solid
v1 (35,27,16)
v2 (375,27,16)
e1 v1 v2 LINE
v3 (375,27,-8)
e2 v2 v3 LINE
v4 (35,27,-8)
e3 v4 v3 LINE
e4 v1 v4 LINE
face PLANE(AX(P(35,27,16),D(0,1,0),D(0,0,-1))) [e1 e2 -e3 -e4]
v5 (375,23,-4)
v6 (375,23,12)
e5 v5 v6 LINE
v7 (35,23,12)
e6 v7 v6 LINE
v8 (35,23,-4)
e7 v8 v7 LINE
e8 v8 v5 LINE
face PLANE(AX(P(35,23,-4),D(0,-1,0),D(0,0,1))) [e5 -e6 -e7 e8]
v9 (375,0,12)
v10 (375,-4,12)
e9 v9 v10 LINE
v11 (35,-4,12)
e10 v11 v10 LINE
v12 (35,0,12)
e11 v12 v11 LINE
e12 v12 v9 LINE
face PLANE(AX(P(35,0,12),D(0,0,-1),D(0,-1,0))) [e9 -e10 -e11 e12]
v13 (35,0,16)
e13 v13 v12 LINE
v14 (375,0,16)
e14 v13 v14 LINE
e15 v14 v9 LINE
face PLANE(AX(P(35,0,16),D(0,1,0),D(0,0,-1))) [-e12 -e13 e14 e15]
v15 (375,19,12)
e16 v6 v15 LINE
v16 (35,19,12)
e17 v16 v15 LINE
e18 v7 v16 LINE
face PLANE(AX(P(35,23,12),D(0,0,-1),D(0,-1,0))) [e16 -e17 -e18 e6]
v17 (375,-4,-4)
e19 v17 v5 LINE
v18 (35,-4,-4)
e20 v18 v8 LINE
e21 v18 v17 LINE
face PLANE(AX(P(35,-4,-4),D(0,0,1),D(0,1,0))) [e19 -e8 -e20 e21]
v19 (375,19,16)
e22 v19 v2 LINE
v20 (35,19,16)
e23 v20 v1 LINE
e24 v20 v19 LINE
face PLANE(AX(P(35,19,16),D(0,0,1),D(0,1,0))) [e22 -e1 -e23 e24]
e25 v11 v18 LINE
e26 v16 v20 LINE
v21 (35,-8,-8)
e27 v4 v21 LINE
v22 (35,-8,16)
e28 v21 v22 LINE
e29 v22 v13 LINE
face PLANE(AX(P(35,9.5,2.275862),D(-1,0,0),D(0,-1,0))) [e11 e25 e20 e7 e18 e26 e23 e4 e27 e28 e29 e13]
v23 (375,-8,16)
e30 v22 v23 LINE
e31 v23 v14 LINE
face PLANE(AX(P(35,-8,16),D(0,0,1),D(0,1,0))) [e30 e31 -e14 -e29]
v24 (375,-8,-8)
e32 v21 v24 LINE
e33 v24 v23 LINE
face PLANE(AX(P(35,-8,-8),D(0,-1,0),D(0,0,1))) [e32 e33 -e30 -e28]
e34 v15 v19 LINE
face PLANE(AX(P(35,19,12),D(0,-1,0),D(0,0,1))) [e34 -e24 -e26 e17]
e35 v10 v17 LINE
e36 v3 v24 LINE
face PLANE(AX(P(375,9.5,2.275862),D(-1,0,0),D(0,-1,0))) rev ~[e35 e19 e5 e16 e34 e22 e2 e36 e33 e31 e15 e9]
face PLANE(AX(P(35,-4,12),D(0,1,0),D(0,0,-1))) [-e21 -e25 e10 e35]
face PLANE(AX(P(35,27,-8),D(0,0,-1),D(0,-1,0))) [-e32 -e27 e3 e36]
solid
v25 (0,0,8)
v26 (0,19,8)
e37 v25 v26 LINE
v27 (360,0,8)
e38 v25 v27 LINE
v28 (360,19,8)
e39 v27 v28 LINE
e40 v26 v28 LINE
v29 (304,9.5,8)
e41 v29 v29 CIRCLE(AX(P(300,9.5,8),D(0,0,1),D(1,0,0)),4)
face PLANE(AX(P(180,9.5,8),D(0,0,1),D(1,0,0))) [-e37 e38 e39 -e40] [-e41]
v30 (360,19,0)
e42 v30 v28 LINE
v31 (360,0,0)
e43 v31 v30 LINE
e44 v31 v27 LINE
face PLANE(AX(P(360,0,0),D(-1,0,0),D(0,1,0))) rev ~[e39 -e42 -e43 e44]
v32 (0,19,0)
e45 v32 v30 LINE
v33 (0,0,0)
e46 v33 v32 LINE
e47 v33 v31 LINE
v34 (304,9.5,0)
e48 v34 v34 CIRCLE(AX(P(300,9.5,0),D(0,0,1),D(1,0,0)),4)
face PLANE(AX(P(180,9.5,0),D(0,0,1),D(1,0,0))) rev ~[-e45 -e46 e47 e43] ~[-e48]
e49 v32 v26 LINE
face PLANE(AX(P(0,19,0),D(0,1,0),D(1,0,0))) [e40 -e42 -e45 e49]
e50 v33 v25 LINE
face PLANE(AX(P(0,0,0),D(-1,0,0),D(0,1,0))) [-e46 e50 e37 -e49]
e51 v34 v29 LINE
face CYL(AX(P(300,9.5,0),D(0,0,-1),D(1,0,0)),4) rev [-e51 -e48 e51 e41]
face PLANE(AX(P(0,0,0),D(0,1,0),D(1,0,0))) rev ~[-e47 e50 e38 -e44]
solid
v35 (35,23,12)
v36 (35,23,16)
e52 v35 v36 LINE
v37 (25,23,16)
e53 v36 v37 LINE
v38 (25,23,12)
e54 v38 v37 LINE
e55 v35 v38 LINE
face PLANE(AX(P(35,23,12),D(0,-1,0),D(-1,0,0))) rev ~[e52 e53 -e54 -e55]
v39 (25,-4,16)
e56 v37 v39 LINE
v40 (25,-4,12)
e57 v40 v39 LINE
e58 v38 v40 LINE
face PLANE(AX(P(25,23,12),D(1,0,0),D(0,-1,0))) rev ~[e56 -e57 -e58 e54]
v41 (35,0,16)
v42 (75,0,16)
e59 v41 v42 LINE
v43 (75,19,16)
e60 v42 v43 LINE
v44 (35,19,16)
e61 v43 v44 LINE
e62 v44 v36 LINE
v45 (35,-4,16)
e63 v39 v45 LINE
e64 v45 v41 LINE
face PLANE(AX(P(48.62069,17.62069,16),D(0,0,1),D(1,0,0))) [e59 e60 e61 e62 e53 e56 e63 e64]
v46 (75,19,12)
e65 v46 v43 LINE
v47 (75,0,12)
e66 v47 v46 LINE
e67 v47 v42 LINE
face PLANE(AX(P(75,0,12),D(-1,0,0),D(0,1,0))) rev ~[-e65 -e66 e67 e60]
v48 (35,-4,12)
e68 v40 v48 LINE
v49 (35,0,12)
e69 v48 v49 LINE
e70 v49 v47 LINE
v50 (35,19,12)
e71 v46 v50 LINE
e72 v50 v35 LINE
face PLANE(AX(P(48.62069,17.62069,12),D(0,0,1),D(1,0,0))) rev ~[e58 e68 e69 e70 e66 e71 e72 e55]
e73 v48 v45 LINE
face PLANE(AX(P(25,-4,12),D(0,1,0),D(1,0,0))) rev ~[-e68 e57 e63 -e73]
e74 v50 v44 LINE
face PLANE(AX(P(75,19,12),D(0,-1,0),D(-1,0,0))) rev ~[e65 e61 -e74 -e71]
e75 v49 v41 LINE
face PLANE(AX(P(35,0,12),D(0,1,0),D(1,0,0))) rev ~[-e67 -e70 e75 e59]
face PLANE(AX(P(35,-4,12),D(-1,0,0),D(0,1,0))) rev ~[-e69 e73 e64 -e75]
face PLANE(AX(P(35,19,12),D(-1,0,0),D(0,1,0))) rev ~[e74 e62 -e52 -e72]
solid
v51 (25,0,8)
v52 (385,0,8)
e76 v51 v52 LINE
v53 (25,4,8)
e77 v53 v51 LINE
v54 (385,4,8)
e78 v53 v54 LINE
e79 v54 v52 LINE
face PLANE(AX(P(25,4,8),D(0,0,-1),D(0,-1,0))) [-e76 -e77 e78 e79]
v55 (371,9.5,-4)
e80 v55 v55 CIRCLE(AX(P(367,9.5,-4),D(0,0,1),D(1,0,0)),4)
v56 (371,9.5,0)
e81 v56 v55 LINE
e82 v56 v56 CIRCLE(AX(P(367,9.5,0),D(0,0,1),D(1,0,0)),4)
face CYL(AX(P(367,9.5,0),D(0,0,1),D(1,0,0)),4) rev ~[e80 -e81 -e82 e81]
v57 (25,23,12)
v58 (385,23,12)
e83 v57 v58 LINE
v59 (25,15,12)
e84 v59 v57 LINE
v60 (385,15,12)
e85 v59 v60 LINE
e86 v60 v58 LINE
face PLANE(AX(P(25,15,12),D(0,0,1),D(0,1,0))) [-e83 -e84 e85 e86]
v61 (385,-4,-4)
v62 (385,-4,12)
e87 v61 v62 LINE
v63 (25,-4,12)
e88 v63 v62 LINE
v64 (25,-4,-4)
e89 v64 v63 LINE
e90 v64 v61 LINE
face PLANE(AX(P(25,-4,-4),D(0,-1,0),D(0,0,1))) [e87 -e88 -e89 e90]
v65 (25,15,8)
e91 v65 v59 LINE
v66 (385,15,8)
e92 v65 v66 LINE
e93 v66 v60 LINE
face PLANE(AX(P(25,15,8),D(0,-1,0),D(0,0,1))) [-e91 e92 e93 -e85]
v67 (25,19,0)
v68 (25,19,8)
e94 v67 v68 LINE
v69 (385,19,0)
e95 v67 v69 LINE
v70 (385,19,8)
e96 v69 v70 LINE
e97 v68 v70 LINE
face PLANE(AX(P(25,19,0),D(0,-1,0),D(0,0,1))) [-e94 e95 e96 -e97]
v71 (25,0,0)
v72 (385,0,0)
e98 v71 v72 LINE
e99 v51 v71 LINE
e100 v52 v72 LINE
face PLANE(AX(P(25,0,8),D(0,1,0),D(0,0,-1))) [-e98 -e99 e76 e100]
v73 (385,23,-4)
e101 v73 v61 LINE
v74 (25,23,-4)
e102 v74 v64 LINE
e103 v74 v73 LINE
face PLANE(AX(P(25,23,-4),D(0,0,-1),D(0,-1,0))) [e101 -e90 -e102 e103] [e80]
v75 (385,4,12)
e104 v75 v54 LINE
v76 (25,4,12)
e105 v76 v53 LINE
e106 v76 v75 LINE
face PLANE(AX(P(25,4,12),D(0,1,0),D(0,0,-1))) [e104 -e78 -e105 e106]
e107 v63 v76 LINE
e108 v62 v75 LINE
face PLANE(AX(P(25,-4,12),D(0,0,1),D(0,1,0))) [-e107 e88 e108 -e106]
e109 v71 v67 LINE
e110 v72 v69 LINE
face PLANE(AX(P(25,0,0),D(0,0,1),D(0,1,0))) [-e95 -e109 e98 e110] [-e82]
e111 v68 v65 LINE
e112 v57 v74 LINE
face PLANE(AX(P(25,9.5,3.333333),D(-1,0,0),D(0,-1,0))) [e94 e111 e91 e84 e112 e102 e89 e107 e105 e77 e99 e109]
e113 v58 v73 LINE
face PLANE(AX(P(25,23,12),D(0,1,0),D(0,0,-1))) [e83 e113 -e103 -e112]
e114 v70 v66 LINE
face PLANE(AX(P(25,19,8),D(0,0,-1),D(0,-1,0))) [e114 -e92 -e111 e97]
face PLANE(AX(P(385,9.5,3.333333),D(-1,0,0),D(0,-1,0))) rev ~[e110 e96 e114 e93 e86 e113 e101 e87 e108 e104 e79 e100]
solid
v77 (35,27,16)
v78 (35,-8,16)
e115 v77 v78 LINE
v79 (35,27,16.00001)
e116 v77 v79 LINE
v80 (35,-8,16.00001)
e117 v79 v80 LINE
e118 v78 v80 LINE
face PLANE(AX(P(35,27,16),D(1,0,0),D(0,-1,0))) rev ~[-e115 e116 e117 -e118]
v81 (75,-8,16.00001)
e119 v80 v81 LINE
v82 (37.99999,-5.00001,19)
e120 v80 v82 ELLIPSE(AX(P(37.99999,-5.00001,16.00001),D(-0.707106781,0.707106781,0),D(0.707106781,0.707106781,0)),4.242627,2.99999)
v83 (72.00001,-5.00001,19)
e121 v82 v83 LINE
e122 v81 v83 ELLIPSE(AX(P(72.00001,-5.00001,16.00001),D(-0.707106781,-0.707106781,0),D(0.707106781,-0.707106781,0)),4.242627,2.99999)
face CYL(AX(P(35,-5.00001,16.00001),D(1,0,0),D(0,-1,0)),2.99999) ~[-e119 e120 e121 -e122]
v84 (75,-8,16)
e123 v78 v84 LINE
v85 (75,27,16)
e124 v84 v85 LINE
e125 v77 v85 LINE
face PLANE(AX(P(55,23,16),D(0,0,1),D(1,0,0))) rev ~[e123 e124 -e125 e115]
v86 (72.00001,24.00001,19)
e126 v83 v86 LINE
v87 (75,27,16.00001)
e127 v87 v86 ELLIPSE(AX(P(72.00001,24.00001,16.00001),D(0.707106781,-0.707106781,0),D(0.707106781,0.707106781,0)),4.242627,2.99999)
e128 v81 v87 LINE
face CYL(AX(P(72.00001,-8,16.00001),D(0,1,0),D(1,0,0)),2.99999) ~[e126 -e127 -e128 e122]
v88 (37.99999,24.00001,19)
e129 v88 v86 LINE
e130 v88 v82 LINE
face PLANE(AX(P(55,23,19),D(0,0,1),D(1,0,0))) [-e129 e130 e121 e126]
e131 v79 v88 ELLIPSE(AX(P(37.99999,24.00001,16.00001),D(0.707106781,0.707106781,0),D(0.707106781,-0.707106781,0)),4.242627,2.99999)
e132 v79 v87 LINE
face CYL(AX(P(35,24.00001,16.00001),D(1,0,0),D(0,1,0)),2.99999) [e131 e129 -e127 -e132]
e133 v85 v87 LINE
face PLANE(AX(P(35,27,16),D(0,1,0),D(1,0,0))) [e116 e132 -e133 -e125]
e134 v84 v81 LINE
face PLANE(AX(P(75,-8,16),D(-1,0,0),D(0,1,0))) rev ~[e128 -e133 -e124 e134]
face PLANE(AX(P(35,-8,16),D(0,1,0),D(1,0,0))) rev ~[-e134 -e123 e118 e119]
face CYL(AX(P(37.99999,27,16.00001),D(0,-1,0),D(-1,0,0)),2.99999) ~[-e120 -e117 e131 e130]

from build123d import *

# Parameters (mm, degrees)
F0_W      = 360
F0_H      = 19
F0_R      = 4
F1_DEPTH  = 8
F4_DEPTH  = 360
F7_DEPTH  = 340
F8_W      = 50
F8_H      = 11
F9_DEPTH  = 4
F10_W     = 40
F10_H     = 8
F10_H_2   = 19
F11_DEPTH = 3
F12_R     = 2.99999
F13_R     = 4
F14_DEPTH = 4


# Not quite as in the source:
# - a fillet or chamfer is up to 0.001 mm smaller than in the source, because OpenCascade refuses the exact size


with BuildPart() as f1:
    # F0 (on Top) → F1 (new body)
    with BuildSketch(Plane.XY):
        with Locations((180, 9.5)):
            Rectangle(F0_W, F0_H)
        with Locations((300, 9.5)):
            Circle(F0_R, mode=Mode.SUBTRACT)
    extrude(amount=F1_DEPTH)


with BuildPart() as f4:
    # F3 (on offset) → F4 (new body)
    with BuildSketch(Plane(origin=(25, 0, 0), x_dir=(0, -1, 0), z_dir=(-1, 0, 0))):
        Polygon((0, 0), (-19, 0), (-19, 8), (-15, 8), (-15, 12), (-23, 12), (-23, -4), (4, -4), (4, 12), (-4, 12), (-4, 8), (0, 8), align=None)
    extrude(amount=-F4_DEPTH)

    # F13 (on face) → F14 (cut)
    with BuildSketch(Plane.XY):
        with Locations((367, 9.5)):
            Circle(F13_R)
    extrude(amount=-F14_DEPTH, mode=Mode.SUBTRACT)


with BuildPart() as f7:
    # F6 (on offset) → F7 (new body)
    with BuildSketch(Plane(origin=(35, 0, 0), x_dir=(0, -1, 0), z_dir=(-1, 0, 0))):
        Polygon((-27, 16), (-27, -8), (8, -8), (8, 16), (0, 16), (0, 12), (4, 12), (4, -4), (-23, -4), (-23, 12), (-19, 12), (-19, 16), align=None)
    extrude(amount=-F7_DEPTH)


with BuildPart() as f9:
    # F8 (on face) → F9 (new body)
    with BuildSketch(Plane.XY.offset(12)):
        Polygon((35, 23), (25, 23), (25, 15), (75, 15), (75, 19), (35, 19), align=None)
        with Locations((50, 9.5)):
            Rectangle(F8_W, F8_H)
        Polygon((75, 4), (25, 4), (25, -4), (35, -4), (35, 0), (75, 0), align=None)
    extrude(amount=F9_DEPTH)


with BuildPart() as f11:
    # F10 (on face) → F11 (new body)
    with BuildSketch(Plane.XY.offset(16)):
        with Locations((55, 23)):
            Rectangle(F10_W, F10_H)
        with Locations((55, 9.5)):
            Rectangle(F10_W, F10_H_2)
        with Locations((55, -4)):
            Rectangle(F10_W, F10_H)
    extrude(amount=F11_DEPTH)

    # F12 (radius 3 in the source; OpenCascade refuses exactly that, so slightly less here)
    f12_edges = [f11.edges().sort_by_distance(p)[0] for p in [
        (55, -8, 19),
        (35, 9.5, 19),
        (55, 27, 19),
        (75, 9.5, 19),
    ]]
    fillet(f12_edges, radius=F12_R)


solid = Compound([f1.part, f4.part, f7.part, f9.part, f11.part])
